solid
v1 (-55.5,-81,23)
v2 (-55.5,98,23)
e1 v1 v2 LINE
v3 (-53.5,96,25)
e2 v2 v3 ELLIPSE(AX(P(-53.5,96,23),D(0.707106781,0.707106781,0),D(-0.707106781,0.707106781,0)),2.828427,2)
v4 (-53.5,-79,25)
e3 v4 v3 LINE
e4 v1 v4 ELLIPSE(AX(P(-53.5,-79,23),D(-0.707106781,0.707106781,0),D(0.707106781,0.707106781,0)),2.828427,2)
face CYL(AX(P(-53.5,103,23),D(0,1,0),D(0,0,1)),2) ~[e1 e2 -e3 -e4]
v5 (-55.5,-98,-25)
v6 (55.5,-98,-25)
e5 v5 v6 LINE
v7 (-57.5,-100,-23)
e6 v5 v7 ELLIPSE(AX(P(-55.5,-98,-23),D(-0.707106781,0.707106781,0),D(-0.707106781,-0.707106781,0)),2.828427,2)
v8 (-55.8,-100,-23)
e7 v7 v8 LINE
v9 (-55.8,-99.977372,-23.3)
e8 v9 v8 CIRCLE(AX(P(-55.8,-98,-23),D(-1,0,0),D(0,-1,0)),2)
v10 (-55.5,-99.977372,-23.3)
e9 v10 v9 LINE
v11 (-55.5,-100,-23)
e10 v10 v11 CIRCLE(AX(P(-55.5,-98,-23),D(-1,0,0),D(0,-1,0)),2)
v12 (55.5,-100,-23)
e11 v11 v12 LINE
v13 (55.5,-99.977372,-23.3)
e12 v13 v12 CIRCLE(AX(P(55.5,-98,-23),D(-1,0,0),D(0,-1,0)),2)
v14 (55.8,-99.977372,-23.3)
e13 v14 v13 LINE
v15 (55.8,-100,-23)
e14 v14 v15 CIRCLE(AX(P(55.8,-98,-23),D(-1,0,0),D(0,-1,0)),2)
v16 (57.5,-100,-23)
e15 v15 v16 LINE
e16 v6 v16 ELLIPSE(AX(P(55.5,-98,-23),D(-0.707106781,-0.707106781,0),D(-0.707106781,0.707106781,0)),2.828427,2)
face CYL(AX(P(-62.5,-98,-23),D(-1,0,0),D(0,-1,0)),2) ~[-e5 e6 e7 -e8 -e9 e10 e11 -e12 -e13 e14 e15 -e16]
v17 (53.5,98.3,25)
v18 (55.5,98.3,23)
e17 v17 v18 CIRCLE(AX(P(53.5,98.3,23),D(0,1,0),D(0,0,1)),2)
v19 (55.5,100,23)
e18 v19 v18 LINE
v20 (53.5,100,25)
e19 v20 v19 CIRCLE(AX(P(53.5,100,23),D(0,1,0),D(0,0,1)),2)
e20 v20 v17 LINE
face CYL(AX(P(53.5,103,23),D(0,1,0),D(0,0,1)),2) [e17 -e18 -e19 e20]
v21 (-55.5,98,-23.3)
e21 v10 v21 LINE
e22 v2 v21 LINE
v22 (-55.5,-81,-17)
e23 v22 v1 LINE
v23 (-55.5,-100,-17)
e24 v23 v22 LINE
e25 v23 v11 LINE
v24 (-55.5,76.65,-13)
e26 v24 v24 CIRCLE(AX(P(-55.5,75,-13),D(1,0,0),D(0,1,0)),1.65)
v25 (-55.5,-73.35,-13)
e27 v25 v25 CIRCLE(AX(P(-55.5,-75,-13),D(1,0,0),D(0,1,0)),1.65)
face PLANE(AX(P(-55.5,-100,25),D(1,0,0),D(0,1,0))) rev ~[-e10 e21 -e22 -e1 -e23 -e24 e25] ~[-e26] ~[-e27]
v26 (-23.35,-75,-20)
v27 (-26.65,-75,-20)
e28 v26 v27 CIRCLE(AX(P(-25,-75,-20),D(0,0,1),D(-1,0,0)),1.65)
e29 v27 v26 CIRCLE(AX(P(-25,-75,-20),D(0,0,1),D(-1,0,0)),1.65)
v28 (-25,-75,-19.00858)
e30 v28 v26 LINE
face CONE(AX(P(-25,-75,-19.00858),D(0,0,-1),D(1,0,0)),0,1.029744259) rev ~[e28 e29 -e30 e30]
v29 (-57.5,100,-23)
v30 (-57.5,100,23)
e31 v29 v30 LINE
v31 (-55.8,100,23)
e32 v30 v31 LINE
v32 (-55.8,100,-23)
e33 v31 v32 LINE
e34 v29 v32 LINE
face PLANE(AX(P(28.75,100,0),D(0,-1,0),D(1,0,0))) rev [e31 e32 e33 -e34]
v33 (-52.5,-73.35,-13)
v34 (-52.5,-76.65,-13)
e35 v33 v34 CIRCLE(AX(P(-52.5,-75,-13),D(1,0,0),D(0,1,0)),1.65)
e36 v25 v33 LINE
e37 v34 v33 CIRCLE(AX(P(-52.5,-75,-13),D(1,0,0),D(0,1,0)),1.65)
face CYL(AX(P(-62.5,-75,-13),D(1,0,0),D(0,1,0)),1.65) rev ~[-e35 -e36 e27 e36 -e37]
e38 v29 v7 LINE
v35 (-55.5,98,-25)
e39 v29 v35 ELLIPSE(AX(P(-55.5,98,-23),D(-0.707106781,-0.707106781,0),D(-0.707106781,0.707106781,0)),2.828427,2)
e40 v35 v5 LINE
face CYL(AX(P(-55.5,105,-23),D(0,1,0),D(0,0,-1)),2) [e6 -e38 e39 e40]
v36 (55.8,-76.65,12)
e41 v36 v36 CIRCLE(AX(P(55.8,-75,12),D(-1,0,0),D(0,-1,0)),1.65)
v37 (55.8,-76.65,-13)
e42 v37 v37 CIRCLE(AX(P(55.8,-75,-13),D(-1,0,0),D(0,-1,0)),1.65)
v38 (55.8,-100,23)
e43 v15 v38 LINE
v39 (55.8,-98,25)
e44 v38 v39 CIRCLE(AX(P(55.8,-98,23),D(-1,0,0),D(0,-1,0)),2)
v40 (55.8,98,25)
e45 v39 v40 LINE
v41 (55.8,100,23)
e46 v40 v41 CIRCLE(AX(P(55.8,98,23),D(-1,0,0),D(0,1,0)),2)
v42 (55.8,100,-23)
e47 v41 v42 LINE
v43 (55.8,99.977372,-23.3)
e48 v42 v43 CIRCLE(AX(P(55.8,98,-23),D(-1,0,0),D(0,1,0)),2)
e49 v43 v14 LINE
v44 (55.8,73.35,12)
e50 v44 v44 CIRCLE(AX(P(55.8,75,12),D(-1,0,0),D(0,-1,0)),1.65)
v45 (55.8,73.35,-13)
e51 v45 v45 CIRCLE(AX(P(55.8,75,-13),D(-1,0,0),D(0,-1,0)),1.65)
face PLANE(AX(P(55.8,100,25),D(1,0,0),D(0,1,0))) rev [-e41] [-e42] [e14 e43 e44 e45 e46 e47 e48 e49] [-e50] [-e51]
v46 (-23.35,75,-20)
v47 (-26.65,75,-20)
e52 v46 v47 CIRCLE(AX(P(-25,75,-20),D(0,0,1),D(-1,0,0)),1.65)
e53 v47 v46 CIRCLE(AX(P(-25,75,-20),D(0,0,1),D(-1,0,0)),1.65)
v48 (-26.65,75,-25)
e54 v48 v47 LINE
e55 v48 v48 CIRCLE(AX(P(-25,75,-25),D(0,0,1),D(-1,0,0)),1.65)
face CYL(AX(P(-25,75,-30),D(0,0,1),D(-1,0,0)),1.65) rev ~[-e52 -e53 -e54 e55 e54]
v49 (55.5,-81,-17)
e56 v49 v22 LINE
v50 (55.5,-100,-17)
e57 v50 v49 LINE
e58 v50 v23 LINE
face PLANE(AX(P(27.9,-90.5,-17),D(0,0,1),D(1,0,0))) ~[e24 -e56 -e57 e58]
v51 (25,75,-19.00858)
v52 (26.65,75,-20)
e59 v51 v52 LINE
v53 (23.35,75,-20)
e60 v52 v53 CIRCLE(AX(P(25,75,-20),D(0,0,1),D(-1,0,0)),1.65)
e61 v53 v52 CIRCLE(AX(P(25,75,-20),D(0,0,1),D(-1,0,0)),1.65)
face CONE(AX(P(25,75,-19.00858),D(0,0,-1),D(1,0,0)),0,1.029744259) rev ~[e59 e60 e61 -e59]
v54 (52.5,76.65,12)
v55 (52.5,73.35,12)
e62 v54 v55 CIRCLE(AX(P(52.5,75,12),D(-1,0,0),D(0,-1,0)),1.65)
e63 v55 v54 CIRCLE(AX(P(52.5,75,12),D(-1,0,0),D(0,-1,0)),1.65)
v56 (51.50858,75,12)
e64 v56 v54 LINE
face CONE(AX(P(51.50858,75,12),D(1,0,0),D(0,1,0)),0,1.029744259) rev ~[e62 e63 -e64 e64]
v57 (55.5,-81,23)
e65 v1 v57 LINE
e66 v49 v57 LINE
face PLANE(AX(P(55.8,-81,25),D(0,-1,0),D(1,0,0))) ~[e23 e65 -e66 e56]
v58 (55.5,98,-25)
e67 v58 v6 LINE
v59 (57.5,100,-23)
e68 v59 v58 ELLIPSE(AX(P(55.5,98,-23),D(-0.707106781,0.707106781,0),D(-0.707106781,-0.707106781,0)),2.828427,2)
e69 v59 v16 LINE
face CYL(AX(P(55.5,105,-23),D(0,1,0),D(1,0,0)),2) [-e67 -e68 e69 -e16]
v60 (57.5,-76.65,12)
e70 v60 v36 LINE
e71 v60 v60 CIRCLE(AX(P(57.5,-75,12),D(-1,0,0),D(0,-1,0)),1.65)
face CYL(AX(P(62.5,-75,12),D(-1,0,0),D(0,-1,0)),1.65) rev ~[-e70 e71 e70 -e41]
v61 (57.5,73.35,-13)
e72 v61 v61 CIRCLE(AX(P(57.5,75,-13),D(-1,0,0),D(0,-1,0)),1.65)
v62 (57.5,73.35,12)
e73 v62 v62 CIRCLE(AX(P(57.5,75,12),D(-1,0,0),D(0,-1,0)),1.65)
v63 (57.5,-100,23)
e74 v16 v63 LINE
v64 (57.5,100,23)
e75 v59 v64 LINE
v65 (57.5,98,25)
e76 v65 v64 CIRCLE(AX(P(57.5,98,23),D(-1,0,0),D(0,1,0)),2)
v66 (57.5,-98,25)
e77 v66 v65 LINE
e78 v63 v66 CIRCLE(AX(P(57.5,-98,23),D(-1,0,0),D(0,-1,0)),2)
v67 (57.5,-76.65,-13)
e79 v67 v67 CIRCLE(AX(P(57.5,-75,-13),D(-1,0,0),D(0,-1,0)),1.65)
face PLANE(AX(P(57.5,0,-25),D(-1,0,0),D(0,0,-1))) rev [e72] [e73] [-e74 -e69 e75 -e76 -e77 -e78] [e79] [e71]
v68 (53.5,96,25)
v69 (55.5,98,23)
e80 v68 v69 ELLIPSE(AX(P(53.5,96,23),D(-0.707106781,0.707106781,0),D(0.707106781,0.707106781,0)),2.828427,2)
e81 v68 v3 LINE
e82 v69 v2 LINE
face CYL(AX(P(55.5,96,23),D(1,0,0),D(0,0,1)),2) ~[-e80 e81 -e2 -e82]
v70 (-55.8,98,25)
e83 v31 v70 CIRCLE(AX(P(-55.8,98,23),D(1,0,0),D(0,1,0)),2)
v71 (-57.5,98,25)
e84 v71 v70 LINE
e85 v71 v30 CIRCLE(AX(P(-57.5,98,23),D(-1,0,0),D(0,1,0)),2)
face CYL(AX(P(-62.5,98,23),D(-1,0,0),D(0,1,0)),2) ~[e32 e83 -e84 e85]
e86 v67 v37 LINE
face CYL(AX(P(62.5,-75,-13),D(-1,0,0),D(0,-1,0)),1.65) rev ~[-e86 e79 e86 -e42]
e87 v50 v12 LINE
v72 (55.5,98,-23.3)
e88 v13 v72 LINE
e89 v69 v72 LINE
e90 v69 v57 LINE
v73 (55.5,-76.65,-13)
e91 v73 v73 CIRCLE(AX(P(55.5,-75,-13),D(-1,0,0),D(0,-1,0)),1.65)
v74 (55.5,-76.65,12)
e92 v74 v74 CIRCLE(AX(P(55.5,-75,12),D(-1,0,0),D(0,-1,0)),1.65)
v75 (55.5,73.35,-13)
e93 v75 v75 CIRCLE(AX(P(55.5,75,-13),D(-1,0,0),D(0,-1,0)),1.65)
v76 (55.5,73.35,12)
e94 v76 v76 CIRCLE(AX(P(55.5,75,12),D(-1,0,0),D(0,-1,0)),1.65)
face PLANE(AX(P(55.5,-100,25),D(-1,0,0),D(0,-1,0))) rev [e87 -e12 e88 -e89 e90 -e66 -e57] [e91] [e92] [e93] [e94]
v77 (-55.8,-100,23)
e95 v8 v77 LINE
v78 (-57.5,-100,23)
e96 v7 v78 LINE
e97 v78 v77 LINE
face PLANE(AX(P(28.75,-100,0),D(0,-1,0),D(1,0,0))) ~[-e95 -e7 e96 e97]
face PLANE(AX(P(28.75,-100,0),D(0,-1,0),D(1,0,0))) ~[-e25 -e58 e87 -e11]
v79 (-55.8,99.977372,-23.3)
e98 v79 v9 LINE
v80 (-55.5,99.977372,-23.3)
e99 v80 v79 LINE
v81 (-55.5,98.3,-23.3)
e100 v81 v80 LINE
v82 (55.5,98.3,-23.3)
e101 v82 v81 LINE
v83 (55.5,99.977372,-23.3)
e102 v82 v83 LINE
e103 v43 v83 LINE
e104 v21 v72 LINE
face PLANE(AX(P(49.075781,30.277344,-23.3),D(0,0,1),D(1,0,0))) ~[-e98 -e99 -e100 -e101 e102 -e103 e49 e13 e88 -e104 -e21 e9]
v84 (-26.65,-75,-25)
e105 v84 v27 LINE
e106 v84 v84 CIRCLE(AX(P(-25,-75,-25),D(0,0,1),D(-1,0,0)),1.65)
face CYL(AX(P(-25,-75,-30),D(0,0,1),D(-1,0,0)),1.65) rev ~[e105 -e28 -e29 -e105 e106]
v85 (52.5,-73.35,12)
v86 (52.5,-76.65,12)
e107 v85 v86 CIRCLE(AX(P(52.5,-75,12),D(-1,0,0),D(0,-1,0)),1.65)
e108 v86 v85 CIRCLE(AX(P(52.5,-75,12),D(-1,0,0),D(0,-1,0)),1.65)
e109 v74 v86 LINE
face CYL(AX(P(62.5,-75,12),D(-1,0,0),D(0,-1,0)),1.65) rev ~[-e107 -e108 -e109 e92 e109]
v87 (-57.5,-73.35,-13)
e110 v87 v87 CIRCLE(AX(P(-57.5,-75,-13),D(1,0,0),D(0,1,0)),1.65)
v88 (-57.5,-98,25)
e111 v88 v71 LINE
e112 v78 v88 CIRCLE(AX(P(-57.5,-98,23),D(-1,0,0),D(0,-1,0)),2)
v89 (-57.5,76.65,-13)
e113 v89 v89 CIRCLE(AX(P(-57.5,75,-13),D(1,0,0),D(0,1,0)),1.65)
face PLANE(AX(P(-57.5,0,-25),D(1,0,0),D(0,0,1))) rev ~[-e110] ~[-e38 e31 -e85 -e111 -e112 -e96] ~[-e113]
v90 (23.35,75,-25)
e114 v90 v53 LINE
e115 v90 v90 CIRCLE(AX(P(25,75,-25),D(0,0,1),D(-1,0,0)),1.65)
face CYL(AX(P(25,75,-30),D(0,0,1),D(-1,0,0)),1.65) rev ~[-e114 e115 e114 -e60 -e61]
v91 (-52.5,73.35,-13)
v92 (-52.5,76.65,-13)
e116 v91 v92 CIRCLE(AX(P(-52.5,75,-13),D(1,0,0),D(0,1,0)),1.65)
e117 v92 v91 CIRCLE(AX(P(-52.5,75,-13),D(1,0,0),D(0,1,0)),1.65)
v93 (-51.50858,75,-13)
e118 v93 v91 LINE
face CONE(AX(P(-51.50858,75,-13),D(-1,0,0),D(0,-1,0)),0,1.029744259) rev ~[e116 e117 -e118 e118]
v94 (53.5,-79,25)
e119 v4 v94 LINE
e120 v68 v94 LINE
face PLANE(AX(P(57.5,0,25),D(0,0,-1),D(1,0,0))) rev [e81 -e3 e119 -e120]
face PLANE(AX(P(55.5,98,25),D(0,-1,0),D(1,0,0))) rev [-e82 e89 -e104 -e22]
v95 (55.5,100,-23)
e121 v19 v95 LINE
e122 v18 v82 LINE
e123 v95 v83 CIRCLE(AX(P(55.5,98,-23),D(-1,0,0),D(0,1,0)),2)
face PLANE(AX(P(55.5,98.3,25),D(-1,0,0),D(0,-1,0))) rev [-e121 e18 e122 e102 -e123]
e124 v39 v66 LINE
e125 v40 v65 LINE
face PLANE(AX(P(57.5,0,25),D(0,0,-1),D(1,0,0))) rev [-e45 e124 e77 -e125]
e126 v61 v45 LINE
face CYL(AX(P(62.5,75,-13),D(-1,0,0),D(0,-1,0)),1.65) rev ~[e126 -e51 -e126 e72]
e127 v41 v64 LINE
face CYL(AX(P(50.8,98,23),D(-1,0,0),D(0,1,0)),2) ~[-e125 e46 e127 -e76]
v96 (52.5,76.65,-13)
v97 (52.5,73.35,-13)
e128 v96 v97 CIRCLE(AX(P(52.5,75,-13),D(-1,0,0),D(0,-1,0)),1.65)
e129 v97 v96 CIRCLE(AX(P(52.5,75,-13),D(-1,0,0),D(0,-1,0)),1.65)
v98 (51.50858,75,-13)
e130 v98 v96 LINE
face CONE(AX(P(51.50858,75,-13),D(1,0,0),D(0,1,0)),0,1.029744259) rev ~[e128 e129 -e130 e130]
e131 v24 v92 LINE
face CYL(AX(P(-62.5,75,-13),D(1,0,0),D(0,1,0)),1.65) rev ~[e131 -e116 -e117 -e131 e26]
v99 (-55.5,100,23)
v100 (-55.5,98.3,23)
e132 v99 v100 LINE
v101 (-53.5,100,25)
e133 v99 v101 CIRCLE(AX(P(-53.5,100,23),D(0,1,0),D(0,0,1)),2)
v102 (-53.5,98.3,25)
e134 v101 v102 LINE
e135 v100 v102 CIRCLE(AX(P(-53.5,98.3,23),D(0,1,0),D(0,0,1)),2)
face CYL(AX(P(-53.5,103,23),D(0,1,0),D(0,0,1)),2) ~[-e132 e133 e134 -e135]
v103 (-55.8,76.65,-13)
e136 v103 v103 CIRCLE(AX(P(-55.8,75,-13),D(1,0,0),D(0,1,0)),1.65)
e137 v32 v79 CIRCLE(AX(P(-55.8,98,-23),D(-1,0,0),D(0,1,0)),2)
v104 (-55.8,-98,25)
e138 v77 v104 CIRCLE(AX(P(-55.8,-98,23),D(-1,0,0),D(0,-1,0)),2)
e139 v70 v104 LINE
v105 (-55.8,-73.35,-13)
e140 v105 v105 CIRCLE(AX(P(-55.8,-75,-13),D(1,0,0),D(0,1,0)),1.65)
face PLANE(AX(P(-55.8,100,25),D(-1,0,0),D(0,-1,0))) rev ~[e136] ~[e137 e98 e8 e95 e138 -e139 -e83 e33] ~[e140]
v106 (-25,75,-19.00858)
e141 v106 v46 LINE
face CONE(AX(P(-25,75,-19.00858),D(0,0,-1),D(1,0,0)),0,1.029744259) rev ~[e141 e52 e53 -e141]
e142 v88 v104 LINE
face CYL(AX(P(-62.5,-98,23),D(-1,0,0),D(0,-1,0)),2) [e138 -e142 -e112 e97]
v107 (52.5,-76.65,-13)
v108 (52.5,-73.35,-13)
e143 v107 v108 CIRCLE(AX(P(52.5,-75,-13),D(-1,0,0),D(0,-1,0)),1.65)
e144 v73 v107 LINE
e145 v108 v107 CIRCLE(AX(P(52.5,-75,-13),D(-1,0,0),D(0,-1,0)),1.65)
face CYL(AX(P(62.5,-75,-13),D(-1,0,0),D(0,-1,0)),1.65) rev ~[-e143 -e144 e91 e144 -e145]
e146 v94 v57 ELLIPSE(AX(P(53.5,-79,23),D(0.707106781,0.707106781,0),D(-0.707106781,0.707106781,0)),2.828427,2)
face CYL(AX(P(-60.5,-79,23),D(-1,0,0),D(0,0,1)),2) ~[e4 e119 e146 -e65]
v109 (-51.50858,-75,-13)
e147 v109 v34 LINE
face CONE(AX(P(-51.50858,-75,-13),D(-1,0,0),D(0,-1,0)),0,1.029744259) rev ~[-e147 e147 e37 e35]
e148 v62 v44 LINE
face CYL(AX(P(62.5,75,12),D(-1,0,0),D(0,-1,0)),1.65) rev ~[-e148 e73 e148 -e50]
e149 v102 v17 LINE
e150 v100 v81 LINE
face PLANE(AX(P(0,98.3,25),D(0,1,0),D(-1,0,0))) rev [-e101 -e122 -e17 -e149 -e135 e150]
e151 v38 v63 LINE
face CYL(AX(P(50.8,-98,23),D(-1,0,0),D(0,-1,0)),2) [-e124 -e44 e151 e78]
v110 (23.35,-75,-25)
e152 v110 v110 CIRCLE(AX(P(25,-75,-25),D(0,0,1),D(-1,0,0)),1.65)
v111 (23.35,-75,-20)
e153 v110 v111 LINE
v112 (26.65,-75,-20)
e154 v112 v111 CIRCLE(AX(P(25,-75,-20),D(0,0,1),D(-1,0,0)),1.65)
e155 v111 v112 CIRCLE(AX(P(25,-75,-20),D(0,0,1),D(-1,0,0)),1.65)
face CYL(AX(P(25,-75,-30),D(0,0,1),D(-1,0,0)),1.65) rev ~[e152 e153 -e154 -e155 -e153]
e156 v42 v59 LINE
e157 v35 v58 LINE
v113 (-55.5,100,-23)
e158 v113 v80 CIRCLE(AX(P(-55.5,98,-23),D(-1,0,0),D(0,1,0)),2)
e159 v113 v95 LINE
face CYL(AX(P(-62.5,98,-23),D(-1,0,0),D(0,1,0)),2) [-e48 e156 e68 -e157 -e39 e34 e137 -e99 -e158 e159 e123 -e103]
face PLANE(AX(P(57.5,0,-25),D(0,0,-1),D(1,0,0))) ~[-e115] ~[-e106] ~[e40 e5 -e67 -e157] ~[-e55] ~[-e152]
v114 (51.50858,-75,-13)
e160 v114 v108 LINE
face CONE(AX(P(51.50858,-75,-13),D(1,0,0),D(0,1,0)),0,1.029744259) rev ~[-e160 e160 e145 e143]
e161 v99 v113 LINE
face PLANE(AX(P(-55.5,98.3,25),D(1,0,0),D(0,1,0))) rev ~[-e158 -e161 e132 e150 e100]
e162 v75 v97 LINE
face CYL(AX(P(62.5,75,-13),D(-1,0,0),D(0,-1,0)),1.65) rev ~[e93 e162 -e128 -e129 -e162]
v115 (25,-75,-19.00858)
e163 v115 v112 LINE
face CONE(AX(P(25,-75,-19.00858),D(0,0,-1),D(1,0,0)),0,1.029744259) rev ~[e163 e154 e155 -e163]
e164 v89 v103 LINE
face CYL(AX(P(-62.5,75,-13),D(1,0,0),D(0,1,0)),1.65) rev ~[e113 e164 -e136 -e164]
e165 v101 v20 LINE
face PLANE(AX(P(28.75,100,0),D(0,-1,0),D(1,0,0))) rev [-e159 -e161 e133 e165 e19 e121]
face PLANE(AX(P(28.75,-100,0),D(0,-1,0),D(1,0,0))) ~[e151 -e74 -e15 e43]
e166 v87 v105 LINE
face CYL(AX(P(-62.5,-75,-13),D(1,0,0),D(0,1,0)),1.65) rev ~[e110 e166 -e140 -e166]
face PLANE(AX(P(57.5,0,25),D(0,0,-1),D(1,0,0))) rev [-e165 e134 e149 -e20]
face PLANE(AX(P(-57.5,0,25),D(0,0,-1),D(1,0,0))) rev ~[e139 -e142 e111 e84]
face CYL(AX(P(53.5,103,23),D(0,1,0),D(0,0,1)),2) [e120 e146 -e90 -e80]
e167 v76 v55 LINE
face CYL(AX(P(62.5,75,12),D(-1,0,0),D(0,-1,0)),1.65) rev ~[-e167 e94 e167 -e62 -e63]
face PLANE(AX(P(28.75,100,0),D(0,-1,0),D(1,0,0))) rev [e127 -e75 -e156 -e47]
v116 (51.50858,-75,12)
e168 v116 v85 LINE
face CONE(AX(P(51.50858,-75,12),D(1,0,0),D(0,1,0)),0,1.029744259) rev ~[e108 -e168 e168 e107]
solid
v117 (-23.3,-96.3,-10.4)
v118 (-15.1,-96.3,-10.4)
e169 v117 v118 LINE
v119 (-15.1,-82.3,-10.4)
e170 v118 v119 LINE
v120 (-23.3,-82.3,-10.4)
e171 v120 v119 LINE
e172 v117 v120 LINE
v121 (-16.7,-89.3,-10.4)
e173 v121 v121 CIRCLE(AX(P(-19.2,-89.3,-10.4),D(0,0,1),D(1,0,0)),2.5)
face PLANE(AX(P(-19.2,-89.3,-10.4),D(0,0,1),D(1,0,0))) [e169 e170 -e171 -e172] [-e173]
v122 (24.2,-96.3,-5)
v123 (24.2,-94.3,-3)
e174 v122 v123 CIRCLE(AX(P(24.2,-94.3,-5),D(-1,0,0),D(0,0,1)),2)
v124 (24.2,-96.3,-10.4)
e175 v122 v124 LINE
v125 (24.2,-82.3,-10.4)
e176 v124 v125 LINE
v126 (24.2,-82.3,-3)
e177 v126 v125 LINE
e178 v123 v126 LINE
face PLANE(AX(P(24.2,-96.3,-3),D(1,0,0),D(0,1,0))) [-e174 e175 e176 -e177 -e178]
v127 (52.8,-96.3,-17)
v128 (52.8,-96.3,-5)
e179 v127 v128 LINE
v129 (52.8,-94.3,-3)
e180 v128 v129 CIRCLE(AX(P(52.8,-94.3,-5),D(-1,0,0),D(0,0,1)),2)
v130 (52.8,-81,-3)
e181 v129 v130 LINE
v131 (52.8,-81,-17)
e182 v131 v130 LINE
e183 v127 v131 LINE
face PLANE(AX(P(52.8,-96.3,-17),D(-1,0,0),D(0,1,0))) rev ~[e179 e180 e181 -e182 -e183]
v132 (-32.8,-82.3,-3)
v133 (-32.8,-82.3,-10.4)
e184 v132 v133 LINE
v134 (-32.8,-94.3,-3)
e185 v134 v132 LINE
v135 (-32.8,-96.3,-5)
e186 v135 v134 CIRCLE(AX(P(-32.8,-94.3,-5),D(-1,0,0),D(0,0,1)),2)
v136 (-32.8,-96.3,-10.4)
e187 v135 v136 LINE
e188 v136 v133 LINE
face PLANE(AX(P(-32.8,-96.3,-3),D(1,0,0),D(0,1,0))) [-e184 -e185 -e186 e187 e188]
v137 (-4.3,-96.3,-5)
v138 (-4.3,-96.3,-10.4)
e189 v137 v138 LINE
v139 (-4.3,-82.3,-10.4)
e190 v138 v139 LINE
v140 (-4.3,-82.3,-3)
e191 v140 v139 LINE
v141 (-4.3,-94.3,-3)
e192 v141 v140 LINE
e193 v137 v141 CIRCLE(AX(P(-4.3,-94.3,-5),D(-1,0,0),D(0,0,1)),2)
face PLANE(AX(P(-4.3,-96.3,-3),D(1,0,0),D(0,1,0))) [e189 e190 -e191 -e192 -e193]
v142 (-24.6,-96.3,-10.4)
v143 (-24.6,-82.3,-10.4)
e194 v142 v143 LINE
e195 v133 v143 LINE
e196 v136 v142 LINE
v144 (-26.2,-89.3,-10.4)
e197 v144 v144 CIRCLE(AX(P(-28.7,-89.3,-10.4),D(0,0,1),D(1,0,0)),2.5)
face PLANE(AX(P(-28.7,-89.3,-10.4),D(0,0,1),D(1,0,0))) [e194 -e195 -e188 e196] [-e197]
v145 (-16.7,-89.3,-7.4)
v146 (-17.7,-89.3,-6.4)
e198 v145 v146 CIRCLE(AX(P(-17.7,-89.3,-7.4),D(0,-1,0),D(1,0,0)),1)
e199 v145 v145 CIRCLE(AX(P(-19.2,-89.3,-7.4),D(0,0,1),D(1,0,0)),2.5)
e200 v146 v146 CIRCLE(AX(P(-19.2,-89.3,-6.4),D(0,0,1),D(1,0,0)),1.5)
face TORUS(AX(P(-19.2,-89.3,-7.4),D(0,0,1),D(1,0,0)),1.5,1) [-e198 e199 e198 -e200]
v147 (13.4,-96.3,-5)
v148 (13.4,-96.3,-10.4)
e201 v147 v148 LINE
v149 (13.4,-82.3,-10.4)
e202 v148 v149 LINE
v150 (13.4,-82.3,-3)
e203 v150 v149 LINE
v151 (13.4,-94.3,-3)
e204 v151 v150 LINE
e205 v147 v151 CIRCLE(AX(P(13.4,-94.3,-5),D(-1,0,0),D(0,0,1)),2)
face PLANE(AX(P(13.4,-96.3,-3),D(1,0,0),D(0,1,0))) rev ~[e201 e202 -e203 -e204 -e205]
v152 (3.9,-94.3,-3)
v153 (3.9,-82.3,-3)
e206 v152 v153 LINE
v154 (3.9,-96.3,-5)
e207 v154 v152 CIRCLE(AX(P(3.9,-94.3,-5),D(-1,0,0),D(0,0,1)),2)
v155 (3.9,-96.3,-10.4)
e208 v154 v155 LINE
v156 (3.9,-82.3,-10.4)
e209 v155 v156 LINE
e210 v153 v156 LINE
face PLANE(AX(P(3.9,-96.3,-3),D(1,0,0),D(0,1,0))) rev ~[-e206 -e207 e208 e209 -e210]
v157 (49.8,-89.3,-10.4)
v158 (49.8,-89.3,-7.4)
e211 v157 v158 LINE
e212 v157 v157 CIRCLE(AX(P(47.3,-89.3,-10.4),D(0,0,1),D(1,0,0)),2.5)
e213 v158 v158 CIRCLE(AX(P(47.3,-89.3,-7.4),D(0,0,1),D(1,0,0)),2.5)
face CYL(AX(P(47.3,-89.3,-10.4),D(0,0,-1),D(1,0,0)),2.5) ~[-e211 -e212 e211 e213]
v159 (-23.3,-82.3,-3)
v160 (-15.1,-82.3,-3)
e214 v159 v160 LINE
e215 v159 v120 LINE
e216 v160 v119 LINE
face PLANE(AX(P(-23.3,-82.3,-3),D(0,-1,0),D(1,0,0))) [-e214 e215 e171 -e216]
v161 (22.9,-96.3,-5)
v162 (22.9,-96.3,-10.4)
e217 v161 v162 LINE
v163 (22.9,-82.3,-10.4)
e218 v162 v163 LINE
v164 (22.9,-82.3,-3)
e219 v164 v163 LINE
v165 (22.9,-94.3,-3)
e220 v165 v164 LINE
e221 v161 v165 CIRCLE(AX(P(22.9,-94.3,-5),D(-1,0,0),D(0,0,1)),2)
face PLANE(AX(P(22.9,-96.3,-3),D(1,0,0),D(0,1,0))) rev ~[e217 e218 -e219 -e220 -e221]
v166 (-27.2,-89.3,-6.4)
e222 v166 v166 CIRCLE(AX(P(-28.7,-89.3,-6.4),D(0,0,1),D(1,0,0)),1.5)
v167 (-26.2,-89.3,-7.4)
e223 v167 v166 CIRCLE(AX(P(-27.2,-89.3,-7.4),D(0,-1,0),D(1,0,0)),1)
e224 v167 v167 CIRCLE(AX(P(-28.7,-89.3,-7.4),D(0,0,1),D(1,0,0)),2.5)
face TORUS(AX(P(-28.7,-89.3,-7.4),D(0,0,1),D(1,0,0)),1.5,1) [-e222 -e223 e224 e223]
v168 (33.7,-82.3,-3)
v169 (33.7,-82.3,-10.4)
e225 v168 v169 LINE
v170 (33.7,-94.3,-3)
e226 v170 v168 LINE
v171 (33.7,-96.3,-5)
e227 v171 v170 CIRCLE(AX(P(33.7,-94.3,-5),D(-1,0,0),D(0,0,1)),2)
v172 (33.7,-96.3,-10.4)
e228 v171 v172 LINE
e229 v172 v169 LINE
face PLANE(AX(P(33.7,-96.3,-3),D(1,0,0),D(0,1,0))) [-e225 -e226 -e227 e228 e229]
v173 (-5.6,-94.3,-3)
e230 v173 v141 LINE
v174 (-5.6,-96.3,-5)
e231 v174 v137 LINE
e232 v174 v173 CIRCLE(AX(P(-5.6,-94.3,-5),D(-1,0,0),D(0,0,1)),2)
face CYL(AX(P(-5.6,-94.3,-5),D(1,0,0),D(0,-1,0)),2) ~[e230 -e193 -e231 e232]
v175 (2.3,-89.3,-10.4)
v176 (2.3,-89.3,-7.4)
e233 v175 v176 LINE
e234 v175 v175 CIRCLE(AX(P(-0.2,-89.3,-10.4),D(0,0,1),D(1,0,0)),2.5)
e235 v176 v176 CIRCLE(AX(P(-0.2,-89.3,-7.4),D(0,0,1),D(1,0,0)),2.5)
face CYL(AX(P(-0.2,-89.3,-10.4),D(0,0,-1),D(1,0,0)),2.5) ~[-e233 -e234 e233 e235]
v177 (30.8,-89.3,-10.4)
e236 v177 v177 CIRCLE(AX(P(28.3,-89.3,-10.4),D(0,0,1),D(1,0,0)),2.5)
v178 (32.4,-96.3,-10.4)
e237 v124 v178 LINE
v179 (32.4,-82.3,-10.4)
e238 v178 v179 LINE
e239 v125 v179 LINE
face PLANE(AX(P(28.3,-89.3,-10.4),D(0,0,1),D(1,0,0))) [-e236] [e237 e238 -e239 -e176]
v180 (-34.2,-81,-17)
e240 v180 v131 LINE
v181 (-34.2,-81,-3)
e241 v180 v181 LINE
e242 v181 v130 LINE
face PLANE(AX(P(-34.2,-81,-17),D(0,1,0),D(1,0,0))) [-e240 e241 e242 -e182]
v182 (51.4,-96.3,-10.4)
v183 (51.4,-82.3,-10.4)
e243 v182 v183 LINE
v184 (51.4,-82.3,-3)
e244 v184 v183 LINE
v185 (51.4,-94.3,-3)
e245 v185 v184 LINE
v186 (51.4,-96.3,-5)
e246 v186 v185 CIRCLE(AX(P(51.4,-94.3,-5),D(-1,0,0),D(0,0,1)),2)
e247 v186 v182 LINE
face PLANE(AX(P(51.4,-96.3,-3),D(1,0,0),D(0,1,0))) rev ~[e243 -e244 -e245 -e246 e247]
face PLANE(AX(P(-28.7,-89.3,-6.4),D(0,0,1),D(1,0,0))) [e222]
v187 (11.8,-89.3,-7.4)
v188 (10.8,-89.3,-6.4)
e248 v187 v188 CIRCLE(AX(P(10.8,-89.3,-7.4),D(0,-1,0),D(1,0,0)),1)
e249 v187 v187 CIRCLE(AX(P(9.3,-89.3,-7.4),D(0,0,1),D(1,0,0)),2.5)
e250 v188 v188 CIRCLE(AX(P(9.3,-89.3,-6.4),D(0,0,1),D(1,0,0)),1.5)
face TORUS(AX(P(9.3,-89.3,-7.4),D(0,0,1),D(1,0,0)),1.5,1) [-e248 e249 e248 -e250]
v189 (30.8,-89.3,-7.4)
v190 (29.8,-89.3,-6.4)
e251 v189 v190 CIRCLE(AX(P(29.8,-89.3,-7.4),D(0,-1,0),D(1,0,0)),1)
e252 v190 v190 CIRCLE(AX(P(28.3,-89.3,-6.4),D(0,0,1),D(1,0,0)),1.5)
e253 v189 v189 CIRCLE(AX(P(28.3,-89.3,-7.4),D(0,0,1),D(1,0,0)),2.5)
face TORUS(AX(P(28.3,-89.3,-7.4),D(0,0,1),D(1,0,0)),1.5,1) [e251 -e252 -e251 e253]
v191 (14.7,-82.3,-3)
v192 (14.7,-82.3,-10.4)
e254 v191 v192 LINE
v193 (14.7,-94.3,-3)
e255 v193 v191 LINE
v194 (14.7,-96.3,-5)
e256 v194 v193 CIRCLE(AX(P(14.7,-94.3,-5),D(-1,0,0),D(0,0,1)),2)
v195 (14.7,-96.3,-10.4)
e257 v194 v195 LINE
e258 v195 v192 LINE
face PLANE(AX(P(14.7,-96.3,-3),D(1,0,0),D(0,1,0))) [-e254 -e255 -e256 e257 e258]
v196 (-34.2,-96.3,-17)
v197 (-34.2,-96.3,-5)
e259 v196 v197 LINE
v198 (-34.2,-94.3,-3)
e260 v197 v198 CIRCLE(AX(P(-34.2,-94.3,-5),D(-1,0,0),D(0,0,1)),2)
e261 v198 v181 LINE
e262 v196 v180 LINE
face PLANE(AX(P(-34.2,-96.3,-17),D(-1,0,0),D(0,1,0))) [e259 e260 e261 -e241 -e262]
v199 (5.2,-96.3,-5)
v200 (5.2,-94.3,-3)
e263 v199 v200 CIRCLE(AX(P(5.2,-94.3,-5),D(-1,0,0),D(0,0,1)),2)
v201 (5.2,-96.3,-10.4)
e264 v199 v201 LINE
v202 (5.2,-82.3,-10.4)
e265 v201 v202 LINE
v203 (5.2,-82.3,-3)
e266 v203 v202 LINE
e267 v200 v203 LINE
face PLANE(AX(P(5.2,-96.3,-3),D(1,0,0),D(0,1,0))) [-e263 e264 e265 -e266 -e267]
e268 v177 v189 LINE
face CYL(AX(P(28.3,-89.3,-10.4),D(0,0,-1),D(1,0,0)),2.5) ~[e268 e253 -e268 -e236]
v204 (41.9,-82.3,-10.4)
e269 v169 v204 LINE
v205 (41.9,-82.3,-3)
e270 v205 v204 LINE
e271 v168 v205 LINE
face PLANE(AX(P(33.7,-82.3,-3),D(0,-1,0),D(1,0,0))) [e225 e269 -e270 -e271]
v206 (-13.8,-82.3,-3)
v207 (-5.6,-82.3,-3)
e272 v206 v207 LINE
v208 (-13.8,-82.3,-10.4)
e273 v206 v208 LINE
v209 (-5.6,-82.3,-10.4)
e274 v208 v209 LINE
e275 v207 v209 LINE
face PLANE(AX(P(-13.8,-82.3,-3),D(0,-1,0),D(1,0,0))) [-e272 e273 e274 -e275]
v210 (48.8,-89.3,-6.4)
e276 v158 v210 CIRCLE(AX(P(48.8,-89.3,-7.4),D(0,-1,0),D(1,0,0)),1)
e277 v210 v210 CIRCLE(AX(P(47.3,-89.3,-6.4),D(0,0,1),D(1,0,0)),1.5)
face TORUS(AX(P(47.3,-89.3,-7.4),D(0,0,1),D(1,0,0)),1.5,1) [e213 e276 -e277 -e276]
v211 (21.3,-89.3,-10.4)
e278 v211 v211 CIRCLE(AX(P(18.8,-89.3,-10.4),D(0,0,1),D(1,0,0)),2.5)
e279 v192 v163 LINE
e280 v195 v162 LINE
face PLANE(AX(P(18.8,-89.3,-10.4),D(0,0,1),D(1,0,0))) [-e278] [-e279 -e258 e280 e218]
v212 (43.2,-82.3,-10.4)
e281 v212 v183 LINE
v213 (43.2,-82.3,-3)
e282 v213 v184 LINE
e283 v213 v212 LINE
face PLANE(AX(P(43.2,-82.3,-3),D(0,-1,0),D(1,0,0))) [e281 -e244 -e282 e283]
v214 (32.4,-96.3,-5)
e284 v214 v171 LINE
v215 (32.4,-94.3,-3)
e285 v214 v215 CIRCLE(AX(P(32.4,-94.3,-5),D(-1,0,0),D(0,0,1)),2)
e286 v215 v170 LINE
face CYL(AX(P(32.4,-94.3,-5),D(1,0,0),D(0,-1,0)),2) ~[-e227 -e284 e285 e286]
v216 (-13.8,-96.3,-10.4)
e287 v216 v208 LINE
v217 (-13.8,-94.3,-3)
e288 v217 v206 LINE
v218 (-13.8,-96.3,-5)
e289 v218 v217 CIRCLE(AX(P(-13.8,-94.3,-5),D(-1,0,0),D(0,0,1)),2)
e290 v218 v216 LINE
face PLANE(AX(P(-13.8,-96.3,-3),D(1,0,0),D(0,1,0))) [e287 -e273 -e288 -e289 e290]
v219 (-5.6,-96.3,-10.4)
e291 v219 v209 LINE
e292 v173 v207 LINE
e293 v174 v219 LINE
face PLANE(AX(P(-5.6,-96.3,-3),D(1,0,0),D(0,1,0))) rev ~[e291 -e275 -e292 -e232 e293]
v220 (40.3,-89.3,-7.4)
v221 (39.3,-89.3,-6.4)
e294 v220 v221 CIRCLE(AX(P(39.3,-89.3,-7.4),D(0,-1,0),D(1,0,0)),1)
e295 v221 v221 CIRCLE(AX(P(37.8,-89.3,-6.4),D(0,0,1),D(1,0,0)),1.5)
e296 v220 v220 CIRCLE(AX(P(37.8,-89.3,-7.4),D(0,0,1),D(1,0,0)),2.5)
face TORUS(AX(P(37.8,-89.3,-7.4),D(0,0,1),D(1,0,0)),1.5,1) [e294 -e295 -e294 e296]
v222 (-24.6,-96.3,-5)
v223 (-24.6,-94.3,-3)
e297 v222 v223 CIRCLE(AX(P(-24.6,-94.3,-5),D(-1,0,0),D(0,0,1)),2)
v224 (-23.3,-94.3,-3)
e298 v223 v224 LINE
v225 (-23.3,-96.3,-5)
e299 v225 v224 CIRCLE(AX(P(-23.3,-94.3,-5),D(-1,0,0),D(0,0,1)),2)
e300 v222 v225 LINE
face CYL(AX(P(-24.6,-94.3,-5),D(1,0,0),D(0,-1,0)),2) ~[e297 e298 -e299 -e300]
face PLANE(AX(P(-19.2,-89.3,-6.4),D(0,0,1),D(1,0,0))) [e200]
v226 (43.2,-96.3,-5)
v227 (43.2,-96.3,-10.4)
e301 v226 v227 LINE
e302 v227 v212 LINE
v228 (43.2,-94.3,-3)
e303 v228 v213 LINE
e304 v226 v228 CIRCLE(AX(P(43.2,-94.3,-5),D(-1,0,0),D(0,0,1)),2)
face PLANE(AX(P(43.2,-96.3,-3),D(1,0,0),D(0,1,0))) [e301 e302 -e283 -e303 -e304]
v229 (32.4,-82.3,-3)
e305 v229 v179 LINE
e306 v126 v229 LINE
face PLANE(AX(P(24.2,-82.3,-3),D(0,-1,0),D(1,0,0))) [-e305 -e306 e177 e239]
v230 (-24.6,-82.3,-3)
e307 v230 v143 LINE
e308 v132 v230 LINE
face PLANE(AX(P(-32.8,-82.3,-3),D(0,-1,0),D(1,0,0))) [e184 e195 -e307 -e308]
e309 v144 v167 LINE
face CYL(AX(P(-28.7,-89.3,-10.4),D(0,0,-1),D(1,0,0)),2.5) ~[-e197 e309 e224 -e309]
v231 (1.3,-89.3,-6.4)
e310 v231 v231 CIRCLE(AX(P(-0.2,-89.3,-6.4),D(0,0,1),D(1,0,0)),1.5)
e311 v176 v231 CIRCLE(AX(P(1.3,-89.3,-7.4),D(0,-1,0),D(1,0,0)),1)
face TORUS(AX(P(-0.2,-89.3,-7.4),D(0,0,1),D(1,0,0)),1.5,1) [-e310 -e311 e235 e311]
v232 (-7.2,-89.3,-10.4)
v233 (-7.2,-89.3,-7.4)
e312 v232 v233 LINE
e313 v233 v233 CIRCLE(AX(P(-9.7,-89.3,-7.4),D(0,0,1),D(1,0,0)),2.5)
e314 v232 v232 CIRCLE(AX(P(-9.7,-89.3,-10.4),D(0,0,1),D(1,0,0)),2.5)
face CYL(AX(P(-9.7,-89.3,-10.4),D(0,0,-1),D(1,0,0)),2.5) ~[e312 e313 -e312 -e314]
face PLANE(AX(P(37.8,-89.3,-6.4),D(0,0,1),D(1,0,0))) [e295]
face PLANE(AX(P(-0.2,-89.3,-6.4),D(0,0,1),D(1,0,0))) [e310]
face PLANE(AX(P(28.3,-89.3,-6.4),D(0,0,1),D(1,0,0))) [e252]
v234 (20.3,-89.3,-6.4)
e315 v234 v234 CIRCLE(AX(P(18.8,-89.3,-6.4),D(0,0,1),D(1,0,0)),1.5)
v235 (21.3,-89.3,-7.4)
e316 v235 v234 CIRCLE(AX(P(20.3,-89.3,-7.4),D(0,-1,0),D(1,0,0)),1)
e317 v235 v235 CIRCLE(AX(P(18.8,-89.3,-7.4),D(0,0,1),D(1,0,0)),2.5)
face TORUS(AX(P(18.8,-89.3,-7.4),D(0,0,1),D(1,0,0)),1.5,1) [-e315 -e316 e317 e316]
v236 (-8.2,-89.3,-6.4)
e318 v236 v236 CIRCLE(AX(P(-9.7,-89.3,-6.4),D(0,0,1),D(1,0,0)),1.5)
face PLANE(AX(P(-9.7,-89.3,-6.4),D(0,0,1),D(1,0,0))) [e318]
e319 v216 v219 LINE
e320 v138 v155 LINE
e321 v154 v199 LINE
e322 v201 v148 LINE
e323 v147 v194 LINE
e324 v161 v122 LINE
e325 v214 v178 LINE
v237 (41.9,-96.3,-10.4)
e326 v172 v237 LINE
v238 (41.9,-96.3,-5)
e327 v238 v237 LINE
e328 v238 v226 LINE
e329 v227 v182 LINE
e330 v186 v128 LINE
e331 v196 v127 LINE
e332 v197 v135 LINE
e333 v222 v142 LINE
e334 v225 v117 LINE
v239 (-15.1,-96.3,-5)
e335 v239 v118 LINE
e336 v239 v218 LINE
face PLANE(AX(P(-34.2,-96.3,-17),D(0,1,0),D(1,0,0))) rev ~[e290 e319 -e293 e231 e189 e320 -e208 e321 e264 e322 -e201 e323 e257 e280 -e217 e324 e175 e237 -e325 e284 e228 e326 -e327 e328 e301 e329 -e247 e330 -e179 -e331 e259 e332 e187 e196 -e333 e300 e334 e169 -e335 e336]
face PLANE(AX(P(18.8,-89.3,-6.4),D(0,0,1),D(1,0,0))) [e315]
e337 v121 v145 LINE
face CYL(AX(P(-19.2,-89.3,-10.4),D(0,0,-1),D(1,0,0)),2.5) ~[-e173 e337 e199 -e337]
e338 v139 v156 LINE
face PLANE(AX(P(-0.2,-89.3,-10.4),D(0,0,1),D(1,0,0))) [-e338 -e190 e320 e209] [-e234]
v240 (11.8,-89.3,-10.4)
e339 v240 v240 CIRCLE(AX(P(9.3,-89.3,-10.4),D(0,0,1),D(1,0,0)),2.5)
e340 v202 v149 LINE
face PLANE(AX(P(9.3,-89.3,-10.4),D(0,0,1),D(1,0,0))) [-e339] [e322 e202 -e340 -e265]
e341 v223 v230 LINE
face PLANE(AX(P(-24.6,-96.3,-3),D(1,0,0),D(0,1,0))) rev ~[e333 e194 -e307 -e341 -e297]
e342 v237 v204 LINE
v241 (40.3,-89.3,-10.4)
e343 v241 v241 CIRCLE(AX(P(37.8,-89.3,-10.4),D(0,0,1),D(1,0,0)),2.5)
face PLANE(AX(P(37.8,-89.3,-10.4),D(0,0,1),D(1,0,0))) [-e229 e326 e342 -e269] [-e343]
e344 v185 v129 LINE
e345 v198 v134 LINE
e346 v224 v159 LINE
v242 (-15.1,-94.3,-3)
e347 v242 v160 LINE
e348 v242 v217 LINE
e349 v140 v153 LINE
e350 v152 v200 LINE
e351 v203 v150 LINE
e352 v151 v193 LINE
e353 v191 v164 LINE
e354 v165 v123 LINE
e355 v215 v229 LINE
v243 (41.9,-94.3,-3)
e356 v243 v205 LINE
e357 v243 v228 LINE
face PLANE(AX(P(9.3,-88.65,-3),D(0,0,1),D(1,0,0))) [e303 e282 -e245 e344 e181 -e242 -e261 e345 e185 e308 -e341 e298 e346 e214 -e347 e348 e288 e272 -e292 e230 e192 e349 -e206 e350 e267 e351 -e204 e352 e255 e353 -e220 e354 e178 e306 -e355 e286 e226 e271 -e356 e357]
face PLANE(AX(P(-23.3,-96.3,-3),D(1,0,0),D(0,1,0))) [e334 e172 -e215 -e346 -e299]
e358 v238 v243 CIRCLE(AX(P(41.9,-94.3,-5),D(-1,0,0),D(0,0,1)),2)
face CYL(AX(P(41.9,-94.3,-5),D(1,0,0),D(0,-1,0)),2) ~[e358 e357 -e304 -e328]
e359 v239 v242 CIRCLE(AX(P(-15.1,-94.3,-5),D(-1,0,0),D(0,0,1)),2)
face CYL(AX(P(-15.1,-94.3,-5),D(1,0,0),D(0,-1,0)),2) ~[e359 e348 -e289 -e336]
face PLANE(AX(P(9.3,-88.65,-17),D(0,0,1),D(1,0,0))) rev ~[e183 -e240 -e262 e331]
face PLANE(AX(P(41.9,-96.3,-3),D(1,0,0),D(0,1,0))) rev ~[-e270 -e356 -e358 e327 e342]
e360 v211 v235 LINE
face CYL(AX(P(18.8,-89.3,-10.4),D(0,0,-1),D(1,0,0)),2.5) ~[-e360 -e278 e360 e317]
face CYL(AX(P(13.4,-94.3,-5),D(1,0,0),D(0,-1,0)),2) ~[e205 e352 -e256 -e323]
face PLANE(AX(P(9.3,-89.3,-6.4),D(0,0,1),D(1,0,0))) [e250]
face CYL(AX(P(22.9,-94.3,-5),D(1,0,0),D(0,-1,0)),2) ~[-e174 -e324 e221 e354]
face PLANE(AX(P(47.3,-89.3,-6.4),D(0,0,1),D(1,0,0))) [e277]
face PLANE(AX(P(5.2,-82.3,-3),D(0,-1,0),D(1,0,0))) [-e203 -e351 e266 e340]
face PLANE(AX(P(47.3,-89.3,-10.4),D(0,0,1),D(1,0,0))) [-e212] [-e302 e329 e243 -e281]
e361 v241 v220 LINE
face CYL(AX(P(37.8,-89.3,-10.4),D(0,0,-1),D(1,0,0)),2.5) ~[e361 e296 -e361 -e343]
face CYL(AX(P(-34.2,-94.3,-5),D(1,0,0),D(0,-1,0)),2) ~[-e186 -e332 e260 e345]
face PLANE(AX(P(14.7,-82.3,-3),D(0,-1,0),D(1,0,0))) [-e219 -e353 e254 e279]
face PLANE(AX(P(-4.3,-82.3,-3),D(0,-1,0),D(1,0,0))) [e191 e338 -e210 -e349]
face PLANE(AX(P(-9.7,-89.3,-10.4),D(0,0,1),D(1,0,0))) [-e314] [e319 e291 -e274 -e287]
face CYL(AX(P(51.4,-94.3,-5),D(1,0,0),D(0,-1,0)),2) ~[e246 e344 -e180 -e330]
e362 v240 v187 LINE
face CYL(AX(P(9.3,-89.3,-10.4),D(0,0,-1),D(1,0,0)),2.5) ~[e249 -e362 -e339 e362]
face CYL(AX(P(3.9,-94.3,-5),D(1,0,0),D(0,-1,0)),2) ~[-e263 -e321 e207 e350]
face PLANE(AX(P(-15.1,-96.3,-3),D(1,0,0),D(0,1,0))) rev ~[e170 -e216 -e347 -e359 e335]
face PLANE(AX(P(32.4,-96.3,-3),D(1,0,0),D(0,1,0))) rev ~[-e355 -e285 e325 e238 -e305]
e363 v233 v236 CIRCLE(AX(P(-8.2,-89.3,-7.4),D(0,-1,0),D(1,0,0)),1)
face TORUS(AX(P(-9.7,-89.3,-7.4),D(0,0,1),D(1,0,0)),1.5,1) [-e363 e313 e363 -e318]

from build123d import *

# Parameters (mm, degrees)
F0_W             = 57.5
F0_H             = 50
F1_DEPTH         = 100
F2_W             = 55.8
F2_H             = 19
F3_DEPTH         = 42
F4_W             = 0.3
F4_H             = 19
F5_DEPTH         = 48.3
F8_W             = 87
F8_H             = 15.3
F9_DEPTH         = 14
F10_W            = 8.2
F10_H            = 14
F11_DEPTH        = 7.4
F12_F1_R         = 2
F12_F2_R         = 2
F12_F3_R         = 2
F12_F4_R         = 2
F12_F5_R         = 2
F12_F6_R         = 2
F12_F7_R         = 2
F12_F8_R         = 2
F12_F9_R         = 2
F12_F10_R        = 2
F12_2_T1_DEPTH   = 189
F12_2_T3_DEPTH   = 11.7
F12_2_T5_DEPTH   = 125
F12_2_T7_DEPTH   = 11.7
F12_2_T9_DEPTH   = 6.7
F12_2_T11_DEPTH  = 11.7
F12_2_T13_DEPTH  = 210
F12_2_T18_DEPTH  = 116
F12_2_T23_DEPTH  = 116
F12_2_T28_DEPTH  = 11.7
F13_R            = 2.5
F14_DEPTH        = 4
F15_R            = 1
F19_D            = 3.3
F19_DEPTH        = 5
F19_TIP          = 0.9914200214
F19_ON_F18_D     = 3.3
F19_ON_F18_DEPTH = 5
F19_ON_F18_TIP   = 0.9914200214
F19_ON_F17_D     = 3.3
F19_ON_F17_DEPTH = 5
F19_ON_F17_TIP   = 0.9914200214


# Not quite as in the source:
# - a fillet or chamfer that OpenCascade refuses, or shapes differently, is made with other operations: its cross-section is extruded or revolved along the edge and cut away or added
# - a feature of the source that left no trace in its solid (it failed there, or was rolled back) is left out


with BuildPart() as f1:
    # F0 (on Front) → F1 (new body, symmetric)
    with BuildSketch(Plane.XZ):
        with Locations((-28.75, 0)):
            Rectangle(F0_W, F0_H)
    extrude(amount=F1_DEPTH, both=True)

    # F2 (on face) → F3 (cut)
    with BuildSketch(Plane.XY.offset(25)):
        with Locations((-27.9, -90.5)):
            Rectangle(F2_W, F2_H)
    extrude(amount=-F3_DEPTH, mode=Mode.SUBTRACT)

    # F4 (on face) → F5 (cut)
    with BuildSketch(Plane.XY.offset(25)):
        Polygon((-55.8, 100), (-55.8, -81), (-55.5, -81), (-55.5, 98), (0, 98), (0, 98.3), (-55.5, 98.3), (-55.5, 100), align=None)
        with Locations((-55.65, -90.5)):
            Rectangle(F4_W, F4_H)
    extrude(amount=-F5_DEPTH, mode=Mode.SUBTRACT)

    # F7: F1 across plane


with BuildPart() as f1_1:
    add(f1.part)
    add(f1.part.mirror(Plane.YZ))

    # F12#2: fillet of radius 2 on 14 edges, made by hand

    # F12_2_s2 → F12_2_t1 (cut)
    with BuildSketch(Plane.XZ.offset(-103)):
        with BuildLine():
            ThreePointArc((53.5, 25), (54.9142135624, 24.4142135624), (55.5, 23))
            Line((55.5, 23), (55.5, 25))
            Line((55.5, 25), (53.5, 25))
        make_face()
        with BuildLine():
            ThreePointArc((-53.5, 25), (-54.9142135624, 24.4142135624), (-55.5, 23))
            Line((-55.5, 23), (-55.5, 25))
            Line((-55.5, 25), (-53.5, 25))
        make_face()
    extrude(amount=F12_2_T1_DEPTH, mode=Mode.SUBTRACT)

    # F12_2_s4 → F12_2_t3 (cut)
    with BuildSketch(Plane.YZ.offset(-62.5)):
        with BuildLine():
            ThreePointArc((-100, 23), (-99.4142135624, 24.4142135624), (-98, 25))
            Line((-98, 25), (-100, 25))
            Line((-100, 25), (-100, 23))
        make_face()
    extrude(amount=F12_2_T3_DEPTH, mode=Mode.SUBTRACT)

    # F12_2_s6 → F12_2_t5 (cut)
    with BuildSketch(Plane.YZ.offset(-62.5)):
        with BuildLine():
            ThreePointArc((-100, -23), (-99.4142135624, -24.4142135624), (-98, -25))
            Line((-98, -25), (-100, -25))
            Line((-100, -25), (-100, -23))
        make_face()
        with BuildLine():
            ThreePointArc((100, -23), (99.4142135624, -24.4142135624), (98, -25))
            Line((98, -25), (100, -25))
            Line((100, -25), (100, -23))
        make_face()
    extrude(amount=F12_2_T5_DEPTH, mode=Mode.SUBTRACT)

    # F12_2_s8 → F12_2_t7 (cut)
    with BuildSketch(Plane.YZ.offset(50.8)):
        with BuildLine():
            ThreePointArc((-100, 23), (-99.4142135624, 24.4142135624), (-98, 25))
            Line((-98, 25), (-100, 25))
            Line((-100, 25), (-100, 23))
        make_face()
    extrude(amount=F12_2_T7_DEPTH, mode=Mode.SUBTRACT)

    # F12_2_s10 → F12_2_t9 (cut)
    with BuildSketch(Plane.YZ.offset(-62.5)):
        with BuildLine():
            ThreePointArc((100, 23), (99.4142135624, 24.4142135624), (98, 25))
            Line((98, 25), (100, 25))
            Line((100, 25), (100, 23))
        make_face()
    extrude(amount=F12_2_T9_DEPTH, mode=Mode.SUBTRACT)

    # F12_2_s12 → F12_2_t11 (cut)
    with BuildSketch(Plane.XZ.offset(-105)):
        with BuildLine():
            ThreePointArc((-55.5, 23), (-54.9142135624, 24.4142135624), (-53.5, 25))
            Line((-53.5, 25), (-55.5, 25))
            Line((-55.5, 25), (-55.5, 23))
        make_face()
        with BuildLine():
            ThreePointArc((53.5, 25), (54.9142135624, 24.4142135624), (55.5, 23))
            Line((55.5, 23), (55.5, 25))
            Line((55.5, 25), (53.5, 25))
        make_face()
    extrude(amount=F12_2_T11_DEPTH, mode=Mode.SUBTRACT)

    # F12_2_s14 → F12_2_t13 (cut)
    with BuildSketch(Plane.XZ.offset(-105)):
        with BuildLine():
            ThreePointArc((57.5, -23), (56.9142135624, -24.4142135624), (55.5, -25))
            Line((55.5, -25), (57.5, -25))
            Line((57.5, -25), (57.5, -23))
        make_face()
        with BuildLine():
            ThreePointArc((-55.5, -25), (-56.9142135624, -24.4142135624), (-57.5, -23))
            Line((-57.5, -23), (-57.5, -25))
            Line((-57.5, -25), (-55.5, -25))
        make_face()
    extrude(amount=F12_2_T13_DEPTH, mode=Mode.SUBTRACT)


with BuildPart() as f9:
    # F8 (on face) → F9 (new body)
    with BuildSketch(Plane.XY.offset(-17)):
        with Locations((9.3, -88.65)):
            Rectangle(F8_W, F8_H)
    extrude(amount=F9_DEPTH)

    # F10 (on face) → F11 (cut)
    with BuildSketch(Plane.XY.offset(-3)):
        with Locations((-28.7, -89.3)):
            Rectangle(F10_W, F10_H)
        with Locations((-19.2, -89.3)):
            Rectangle(F10_W, F10_H)
        with Locations((-9.7, -89.3)):
            Rectangle(F10_W, F10_H)
        with Locations((-0.2, -89.3)):
            Rectangle(F10_W, F10_H)
        with Locations((9.3, -89.3)):
            Rectangle(F10_W, F10_H)
        with Locations((18.8, -89.3)):
            Rectangle(F10_W, F10_H)
        with Locations((28.3, -89.3)):
            Rectangle(F10_W, F10_H)
        with Locations((37.8, -89.3)):
            Rectangle(F10_W, F10_H)
        with Locations((47.3, -89.3)):
            Rectangle(F10_W, F10_H)
    extrude(amount=-F11_DEPTH, mode=Mode.SUBTRACT)

    # F12: fillet of radius 2 on 10 edges, made by hand

    # F12_f1
    f12_f1_edges = [f9.edges().sort_by_distance(p)[0] for p in [
        (52.1, -96.3, -3),
    ]]
    fillet(f12_f1_edges, radius=F12_F1_R)

    # F12_f2
    f12_f2_edges = [f9.edges().sort_by_distance(p)[0] for p in [
        (42.55, -96.3, -3),
    ]]
    fillet(f12_f2_edges, radius=F12_F2_R)

    # F12_f3
    f12_f3_edges = [f9.edges().sort_by_distance(p)[0] for p in [
        (33.05, -96.3, -3),
    ]]
    fillet(f12_f3_edges, radius=F12_F3_R)

    # F12_f4
    f12_f4_edges = [f9.edges().sort_by_distance(p)[0] for p in [
        (23.55, -96.3, -3),
    ]]
    fillet(f12_f4_edges, radius=F12_F4_R)

    # F12_f5
    f12_f5_edges = [f9.edges().sort_by_distance(p)[0] for p in [
        (14.05, -96.3, -3),
    ]]
    fillet(f12_f5_edges, radius=F12_F5_R)

    # F12_f6
    f12_f6_edges = [f9.edges().sort_by_distance(p)[0] for p in [
        (4.55, -96.3, -3),
    ]]
    fillet(f12_f6_edges, radius=F12_F6_R)

    # F12_f7
    f12_f7_edges = [f9.edges().sort_by_distance(p)[0] for p in [
        (-4.95, -96.3, -3),
    ]]
    fillet(f12_f7_edges, radius=F12_F7_R)

    # F12_f8
    f12_f8_edges = [f9.edges().sort_by_distance(p)[0] for p in [
        (-14.45, -96.3, -3),
    ]]
    fillet(f12_f8_edges, radius=F12_F8_R)

    # F12_f9
    f12_f9_edges = [f9.edges().sort_by_distance(p)[0] for p in [
        (-23.95, -96.3, -3),
    ]]
    fillet(f12_f9_edges, radius=F12_F9_R)

    # F12_f10
    f12_f10_edges = [f9.edges().sort_by_distance(p)[0] for p in [
        (-33.5, -96.3, -3),
    ]]
    fillet(f12_f10_edges, radius=F12_F10_R)

    # F13 (on face) → F14 (join)
    with BuildSketch(Plane.XY.offset(-10.4)):
        with Locations((-28.7, -89.3)):
            Circle(F13_R)
        with Locations((-19.2, -89.3)):
            Circle(F13_R)
        with Locations((-9.7, -89.3)):
            Circle(F13_R)
        with Locations((-0.2, -89.3)):
            Circle(F13_R)
        with Locations((9.3, -89.3)):
            Circle(F13_R)
        with Locations((18.8, -89.3)):
            Circle(F13_R)
        with Locations((28.3, -89.3)):
            Circle(F13_R)
        with Locations((37.8, -89.3)):
            Circle(F13_R)
        with Locations((47.3, -89.3)):
            Circle(F13_R)
    extrude(amount=F14_DEPTH)

    # F15
    f15_edges = [f9.edges().sort_by_distance(p)[0] for p in [
        (-31.2, -89.3, -6.4),
        (-21.7, -89.3, -6.4),
        (-12.2, -89.3, -6.4),
        (-2.7, -89.3, -6.4),
        (6.8, -89.3, -6.4),
        (16.3, -89.3, -6.4),
        (25.8, -89.3, -6.4),
        (35.3, -89.3, -6.4),
        (44.8, -89.3, -6.4),
    ]]
    fillet(f15_edges, radius=F15_R)


with BuildPart() as f12_2_tool16:
    # F12_2_s17 → F12_2_t18 (new body)
    with BuildSketch(Plane.YZ.offset(-60.5)):
        with BuildLine():
            ThreePointArc((-79, 25), (-80.4142135624, 24.4142135624), (-81, 23))
            Line((-81, 23), (-81, 25))
            Line((-81, 25), (-79, 25))
        make_face()
    extrude(amount=F12_2_T18_DEPTH)

    split(bisect_by=Plane.YZ.offset(-55.8), keep=Keep.TOP)


with BuildPart() as f1_2:
    add(f1_1.part)

    # F12_2_t15: cut F12_2_tool16
    add(f12_2_tool16.part, mode=Mode.SUBTRACT)


with BuildPart() as f12_2_tool21:
    # F12_2_s22 → F12_2_t23 (new body)
    with BuildSketch(Plane.YZ.offset(55.5)):
        with BuildLine():
            ThreePointArc((96, 25), (97.4142135624, 24.4142135624), (98, 23))
            Line((98, 23), (98, 25))
            Line((98, 25), (96, 25))
        make_face()
    extrude(amount=-F12_2_T23_DEPTH)

    split(bisect_by=Plane.YZ.offset(-55.8), keep=Keep.TOP)


with BuildPart() as f1_3:
    add(f1_2.part)

    # F12_2_t20: cut F12_2_tool21
    add(f12_2_tool21.part, mode=Mode.SUBTRACT)


with BuildPart() as f12_2_tool26:
    # F12_2_s27 → F12_2_t28 (new body)
    with BuildSketch(Plane.YZ.offset(50.8)):
        with BuildLine():
            ThreePointArc((100, 23), (99.4142135624, 24.4142135624), (98, 25))
            Line((98, 25), (100, 25))
            Line((100, 25), (100, 23))
        make_face()
    extrude(amount=F12_2_T28_DEPTH)

    split(bisect_by=Plane.YZ.offset(55.5), keep=Keep.TOP)


with BuildPart() as f1_4:
    add(f1_3.part)

    # F12_2_t25: cut F12_2_tool26
    add(f12_2_tool26.part, mode=Mode.SUBTRACT)

    # F19
    with Locations(Plane(origin=(-57.5, 0, 0), x_dir=(0, -1, 0), z_dir=(-1, 0, 0))):
        with Locations((-75, -13), (75, -13)):
            Hole(F19_D / 2, depth=F19_DEPTH)
            with Locations((0, 0, -(F19_DEPTH + F19_TIP / 2))):  # 118° drill point
                Cone(0, F19_D / 2, F19_TIP, mode=Mode.SUBTRACT)

    # F19 on F18
    with Locations(Plane(origin=(0, 0, -25), x_dir=(1, 0, 0), z_dir=(0, 0, -1))):
        with Locations((-25, -75), (-25, 75), (25, -75), (25, 75)):
            Hole(F19_ON_F18_D / 2, depth=F19_ON_F18_DEPTH)
            with Locations((0, 0, -(F19_ON_F18_DEPTH + F19_ON_F18_TIP / 2))):  # 118° drill point
                Cone(0, F19_ON_F18_D / 2, F19_ON_F18_TIP, mode=Mode.SUBTRACT)

    # F19 on F17
    with Locations(Plane.YZ.offset(57.5)):
        with Locations((-75, -13), (-75, 12), (75, 12), (75, -13)):
            Hole(F19_ON_F17_D / 2, depth=F19_ON_F17_DEPTH)
            with Locations((0, 0, -(F19_ON_F17_DEPTH + F19_ON_F17_TIP / 2))):  # 118° drill point
                Cone(0, F19_ON_F17_D / 2, F19_ON_F17_TIP, mode=Mode.SUBTRACT)


solid = Compound([f9.part, f1_4.part])
